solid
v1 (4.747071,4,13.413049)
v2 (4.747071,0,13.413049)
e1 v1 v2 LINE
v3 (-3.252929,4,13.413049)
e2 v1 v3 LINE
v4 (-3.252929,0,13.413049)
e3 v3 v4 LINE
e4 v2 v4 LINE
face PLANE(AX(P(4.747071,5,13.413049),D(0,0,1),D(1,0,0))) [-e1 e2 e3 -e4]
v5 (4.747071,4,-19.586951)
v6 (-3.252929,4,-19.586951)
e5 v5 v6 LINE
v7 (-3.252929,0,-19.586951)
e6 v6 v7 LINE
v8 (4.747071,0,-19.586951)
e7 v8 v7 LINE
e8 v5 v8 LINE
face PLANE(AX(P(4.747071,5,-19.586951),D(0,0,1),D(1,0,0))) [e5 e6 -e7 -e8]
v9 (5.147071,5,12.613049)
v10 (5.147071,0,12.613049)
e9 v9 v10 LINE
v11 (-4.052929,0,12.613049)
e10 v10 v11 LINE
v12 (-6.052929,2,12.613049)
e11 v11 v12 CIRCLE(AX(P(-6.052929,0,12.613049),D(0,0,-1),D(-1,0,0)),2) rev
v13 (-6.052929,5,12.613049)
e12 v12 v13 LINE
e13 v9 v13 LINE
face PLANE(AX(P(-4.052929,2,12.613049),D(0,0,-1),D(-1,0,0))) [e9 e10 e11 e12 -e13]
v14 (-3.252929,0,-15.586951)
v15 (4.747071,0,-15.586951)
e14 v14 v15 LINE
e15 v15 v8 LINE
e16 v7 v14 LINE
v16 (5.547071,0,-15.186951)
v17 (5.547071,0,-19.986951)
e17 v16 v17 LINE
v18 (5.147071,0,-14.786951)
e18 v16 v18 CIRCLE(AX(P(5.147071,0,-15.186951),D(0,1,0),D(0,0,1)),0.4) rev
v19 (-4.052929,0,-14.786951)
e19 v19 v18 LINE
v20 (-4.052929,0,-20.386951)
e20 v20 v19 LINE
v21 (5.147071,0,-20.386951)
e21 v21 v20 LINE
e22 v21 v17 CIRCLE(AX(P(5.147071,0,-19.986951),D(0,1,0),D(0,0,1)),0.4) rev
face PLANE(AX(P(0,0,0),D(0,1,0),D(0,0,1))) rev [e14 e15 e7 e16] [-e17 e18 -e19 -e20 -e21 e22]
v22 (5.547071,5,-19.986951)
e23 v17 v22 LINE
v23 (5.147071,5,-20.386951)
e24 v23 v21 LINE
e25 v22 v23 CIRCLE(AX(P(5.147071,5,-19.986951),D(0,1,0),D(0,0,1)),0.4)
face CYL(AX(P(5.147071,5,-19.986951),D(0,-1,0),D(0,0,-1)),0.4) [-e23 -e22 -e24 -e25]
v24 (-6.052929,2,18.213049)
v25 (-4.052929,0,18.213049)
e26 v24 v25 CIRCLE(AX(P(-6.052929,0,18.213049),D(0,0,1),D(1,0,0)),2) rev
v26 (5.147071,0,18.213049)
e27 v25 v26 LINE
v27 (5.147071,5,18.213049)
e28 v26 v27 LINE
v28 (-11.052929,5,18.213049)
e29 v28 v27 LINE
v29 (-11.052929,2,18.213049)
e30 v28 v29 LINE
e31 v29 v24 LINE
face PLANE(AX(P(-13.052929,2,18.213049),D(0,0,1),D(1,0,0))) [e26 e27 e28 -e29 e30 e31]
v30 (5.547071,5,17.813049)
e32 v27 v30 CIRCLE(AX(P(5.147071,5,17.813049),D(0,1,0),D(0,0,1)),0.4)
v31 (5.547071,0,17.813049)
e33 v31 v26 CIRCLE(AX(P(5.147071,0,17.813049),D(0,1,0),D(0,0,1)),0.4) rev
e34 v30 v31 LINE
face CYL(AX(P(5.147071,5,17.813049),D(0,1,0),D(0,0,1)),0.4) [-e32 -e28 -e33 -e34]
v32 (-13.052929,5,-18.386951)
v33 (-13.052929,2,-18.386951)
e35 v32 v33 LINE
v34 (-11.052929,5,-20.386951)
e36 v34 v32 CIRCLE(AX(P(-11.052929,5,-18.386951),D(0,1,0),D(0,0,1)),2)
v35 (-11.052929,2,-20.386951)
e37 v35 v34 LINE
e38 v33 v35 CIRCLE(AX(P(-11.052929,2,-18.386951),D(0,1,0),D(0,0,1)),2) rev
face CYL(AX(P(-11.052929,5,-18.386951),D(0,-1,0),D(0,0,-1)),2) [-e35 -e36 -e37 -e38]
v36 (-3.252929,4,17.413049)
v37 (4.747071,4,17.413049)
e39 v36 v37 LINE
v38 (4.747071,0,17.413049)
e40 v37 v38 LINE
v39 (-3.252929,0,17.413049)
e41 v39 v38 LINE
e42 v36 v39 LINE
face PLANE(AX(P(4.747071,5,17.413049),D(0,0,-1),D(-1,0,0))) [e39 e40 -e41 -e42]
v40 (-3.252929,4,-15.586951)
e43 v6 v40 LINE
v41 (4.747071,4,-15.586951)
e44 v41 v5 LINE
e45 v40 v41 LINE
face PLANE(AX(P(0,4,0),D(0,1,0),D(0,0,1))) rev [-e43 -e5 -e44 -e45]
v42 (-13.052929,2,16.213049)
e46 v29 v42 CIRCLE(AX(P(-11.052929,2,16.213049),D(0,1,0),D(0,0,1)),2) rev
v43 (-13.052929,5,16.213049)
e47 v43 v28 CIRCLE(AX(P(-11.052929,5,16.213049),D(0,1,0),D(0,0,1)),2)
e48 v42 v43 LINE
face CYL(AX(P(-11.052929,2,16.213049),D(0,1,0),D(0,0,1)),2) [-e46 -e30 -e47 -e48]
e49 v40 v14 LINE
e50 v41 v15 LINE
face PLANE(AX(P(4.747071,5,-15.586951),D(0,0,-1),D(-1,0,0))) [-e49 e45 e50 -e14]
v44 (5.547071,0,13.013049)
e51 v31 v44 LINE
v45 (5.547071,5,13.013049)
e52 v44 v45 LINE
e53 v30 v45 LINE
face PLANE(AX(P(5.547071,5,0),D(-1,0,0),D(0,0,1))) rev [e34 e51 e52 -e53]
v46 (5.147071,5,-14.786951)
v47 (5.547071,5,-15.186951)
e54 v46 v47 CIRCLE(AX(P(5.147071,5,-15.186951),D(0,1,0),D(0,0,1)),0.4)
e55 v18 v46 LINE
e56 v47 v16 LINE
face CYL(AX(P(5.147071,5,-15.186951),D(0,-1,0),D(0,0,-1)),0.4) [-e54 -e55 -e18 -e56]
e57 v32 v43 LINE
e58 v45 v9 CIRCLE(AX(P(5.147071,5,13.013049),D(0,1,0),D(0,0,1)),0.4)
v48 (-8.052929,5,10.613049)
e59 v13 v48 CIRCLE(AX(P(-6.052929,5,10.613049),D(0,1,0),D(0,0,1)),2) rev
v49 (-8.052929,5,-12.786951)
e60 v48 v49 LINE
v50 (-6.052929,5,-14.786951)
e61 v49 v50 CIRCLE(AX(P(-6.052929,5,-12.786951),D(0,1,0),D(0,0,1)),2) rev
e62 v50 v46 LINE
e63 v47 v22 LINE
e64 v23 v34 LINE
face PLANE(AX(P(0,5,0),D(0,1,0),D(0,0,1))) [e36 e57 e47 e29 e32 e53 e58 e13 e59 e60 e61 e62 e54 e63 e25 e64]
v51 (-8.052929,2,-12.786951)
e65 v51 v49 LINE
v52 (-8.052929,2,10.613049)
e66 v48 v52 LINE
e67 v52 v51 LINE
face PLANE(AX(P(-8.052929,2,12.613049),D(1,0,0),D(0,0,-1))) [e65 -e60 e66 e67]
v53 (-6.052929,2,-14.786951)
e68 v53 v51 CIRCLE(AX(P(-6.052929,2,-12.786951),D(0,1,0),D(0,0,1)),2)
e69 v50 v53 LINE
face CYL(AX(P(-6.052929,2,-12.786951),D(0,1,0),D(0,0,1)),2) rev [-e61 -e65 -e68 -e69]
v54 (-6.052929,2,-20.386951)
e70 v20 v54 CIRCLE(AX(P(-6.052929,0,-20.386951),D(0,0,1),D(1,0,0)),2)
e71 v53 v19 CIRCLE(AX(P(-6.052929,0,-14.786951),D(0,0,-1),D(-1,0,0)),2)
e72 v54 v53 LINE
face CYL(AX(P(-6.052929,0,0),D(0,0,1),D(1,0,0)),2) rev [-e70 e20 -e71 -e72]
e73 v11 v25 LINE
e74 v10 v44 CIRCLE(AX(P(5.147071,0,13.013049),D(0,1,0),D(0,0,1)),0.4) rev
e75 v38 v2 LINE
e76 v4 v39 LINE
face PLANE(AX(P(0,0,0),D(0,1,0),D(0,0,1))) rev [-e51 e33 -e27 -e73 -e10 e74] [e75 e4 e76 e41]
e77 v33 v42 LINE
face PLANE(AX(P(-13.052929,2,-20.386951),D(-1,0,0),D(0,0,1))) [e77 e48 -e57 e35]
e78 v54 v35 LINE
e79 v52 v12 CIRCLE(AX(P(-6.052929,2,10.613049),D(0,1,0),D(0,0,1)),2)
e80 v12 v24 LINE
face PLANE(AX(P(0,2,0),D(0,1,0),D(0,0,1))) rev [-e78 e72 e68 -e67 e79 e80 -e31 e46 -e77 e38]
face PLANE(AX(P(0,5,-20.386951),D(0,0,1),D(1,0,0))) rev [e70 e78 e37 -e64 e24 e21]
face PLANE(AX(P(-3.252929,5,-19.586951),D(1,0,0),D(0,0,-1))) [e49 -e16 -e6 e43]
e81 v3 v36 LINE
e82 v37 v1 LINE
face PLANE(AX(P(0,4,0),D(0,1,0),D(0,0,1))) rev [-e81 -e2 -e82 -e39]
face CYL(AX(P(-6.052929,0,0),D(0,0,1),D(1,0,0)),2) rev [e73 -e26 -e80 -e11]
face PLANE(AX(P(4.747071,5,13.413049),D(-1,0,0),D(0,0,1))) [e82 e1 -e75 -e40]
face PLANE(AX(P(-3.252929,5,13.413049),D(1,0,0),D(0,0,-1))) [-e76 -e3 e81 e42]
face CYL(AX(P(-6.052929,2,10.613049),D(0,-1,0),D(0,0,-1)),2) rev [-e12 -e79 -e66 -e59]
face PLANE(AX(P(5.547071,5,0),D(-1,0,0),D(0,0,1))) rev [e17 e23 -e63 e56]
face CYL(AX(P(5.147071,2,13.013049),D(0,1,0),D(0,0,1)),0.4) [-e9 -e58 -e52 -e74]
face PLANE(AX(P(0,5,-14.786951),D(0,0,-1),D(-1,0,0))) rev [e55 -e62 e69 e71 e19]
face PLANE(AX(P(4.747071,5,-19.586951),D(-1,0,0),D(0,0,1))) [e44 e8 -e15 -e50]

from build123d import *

# Parameters (mm, degrees)
SKETCH_1_W        = 9.6
SKETCH_1_H        = 5.6
SKETCH_1_W_2      = 8
SKETCH_1_H_2      = 4
EXTRUDE_1_DEPTH   = 5
EXTRUDE_1_2_DEPTH = 5
EXTRUDE_1_3_DEPTH = 3
SKETCH_3_W        = 8
SKETCH_3_H        = 4
EXTRUDE_2_DEPTH   = 1
FILLET_1_R        = 2
FILLET_2_R        = 0.4


with BuildPart() as part:
    # Эскиз1 → Extrude 1 (new body)
    with BuildSketch(Plane(origin=(0, 0, 0), x_dir=(1, 0, 0), z_dir=(0, 1, 0))):
        with Locations((0.747071049, 17.586951222)):
            Rectangle(SKETCH_1_W, SKETCH_1_H)
        with Locations((0.747071049, 17.586951222)):
            Rectangle(SKETCH_1_W_2, SKETCH_1_H_2, mode=Mode.SUBTRACT)
    extrude(amount=EXTRUDE_1_DEPTH)



with BuildPart() as body_2:
    # Эскиз1 → Extrude 1 2 (new body)
    with BuildSketch(Plane(origin=(0, 0, 0), x_dir=(1, 0, 0), z_dir=(0, 1, 0))):
        with Locations((0.747071049, -15.413048778)):
            Rectangle(SKETCH_1_W, SKETCH_1_H)
        with Locations((0.747071049, -15.413048778)):
            Rectangle(SKETCH_1_W_2, SKETCH_1_H_2, mode=Mode.SUBTRACT)
    extrude(amount=EXTRUDE_1_2_DEPTH)


with BuildPart() as part_1:
    add(part.part)

    add(body_2.part)  # Extrude 1 3 merges body 2
    # Эскиз2 → Extrude 1 3 (add)
    with BuildSketch(Plane(origin=(0, 5, 0), x_dir=(1, 0, 0), z_dir=(0, 1, 0))):
        Polygon((-4.052928951, 20.386951222), (-13.052928951, 20.386951222), (-13.052928951, -18.213048778), (-4.052928951, -18.213048778), (-4.052928951, -12.613048778), (-8.052928951, -12.613048778), (-8.052928951, 14.786951222), (-4.052928951, 14.786951222), align=None)
    extrude(amount=-EXTRUDE_1_3_DEPTH)

    # Эскиз3 → Бобышка-Вытянуть2 (add)
    with BuildSketch(Plane(origin=(0, 5, 0), x_dir=(1, 0, 0), z_dir=(0, 1, 0))):
        with Locations((0.747071049, 17.586951222)):
            Rectangle(SKETCH_3_W, SKETCH_3_H)
        with Locations((0.747071049, -15.413048778)):
            Rectangle(SKETCH_3_W, SKETCH_3_H)
    extrude(amount=-EXTRUDE_2_DEPTH)

    # Скругление1
    fillet_1_edges = [part_1.edges().sort_by_distance(p)[0] for p in [
        (-4.052928951, 2, -17.586951222),
        (-4.052928951, 2, 15.413048778),
        (-8.052928951, 3.5, 12.613048778),
        (-8.052928951, 3.5, -14.786951222),
        (-13.052928951, 3.5, -20.386951222),
        (-13.052928951, 3.5, 18.213048778),
    ]]
    fillet(fillet_1_edges, radius=FILLET_1_R - 0.0001)  # a hair under: the kernel refuses the full size

    # Скругление2
    fillet_2_edges = [part_1.edges().sort_by_distance(p)[0] for p in [
        (5.547071049, 2.5, 18.213048778),
        (5.547071049, 2.5, 12.613048778),
        (5.547071049, 2.5, -14.786951222),
        (5.547071049, 2.5, -20.386951222),
    ]]
    fillet(fillet_2_edges, radius=FILLET_2_R)


solid = part_1.part
